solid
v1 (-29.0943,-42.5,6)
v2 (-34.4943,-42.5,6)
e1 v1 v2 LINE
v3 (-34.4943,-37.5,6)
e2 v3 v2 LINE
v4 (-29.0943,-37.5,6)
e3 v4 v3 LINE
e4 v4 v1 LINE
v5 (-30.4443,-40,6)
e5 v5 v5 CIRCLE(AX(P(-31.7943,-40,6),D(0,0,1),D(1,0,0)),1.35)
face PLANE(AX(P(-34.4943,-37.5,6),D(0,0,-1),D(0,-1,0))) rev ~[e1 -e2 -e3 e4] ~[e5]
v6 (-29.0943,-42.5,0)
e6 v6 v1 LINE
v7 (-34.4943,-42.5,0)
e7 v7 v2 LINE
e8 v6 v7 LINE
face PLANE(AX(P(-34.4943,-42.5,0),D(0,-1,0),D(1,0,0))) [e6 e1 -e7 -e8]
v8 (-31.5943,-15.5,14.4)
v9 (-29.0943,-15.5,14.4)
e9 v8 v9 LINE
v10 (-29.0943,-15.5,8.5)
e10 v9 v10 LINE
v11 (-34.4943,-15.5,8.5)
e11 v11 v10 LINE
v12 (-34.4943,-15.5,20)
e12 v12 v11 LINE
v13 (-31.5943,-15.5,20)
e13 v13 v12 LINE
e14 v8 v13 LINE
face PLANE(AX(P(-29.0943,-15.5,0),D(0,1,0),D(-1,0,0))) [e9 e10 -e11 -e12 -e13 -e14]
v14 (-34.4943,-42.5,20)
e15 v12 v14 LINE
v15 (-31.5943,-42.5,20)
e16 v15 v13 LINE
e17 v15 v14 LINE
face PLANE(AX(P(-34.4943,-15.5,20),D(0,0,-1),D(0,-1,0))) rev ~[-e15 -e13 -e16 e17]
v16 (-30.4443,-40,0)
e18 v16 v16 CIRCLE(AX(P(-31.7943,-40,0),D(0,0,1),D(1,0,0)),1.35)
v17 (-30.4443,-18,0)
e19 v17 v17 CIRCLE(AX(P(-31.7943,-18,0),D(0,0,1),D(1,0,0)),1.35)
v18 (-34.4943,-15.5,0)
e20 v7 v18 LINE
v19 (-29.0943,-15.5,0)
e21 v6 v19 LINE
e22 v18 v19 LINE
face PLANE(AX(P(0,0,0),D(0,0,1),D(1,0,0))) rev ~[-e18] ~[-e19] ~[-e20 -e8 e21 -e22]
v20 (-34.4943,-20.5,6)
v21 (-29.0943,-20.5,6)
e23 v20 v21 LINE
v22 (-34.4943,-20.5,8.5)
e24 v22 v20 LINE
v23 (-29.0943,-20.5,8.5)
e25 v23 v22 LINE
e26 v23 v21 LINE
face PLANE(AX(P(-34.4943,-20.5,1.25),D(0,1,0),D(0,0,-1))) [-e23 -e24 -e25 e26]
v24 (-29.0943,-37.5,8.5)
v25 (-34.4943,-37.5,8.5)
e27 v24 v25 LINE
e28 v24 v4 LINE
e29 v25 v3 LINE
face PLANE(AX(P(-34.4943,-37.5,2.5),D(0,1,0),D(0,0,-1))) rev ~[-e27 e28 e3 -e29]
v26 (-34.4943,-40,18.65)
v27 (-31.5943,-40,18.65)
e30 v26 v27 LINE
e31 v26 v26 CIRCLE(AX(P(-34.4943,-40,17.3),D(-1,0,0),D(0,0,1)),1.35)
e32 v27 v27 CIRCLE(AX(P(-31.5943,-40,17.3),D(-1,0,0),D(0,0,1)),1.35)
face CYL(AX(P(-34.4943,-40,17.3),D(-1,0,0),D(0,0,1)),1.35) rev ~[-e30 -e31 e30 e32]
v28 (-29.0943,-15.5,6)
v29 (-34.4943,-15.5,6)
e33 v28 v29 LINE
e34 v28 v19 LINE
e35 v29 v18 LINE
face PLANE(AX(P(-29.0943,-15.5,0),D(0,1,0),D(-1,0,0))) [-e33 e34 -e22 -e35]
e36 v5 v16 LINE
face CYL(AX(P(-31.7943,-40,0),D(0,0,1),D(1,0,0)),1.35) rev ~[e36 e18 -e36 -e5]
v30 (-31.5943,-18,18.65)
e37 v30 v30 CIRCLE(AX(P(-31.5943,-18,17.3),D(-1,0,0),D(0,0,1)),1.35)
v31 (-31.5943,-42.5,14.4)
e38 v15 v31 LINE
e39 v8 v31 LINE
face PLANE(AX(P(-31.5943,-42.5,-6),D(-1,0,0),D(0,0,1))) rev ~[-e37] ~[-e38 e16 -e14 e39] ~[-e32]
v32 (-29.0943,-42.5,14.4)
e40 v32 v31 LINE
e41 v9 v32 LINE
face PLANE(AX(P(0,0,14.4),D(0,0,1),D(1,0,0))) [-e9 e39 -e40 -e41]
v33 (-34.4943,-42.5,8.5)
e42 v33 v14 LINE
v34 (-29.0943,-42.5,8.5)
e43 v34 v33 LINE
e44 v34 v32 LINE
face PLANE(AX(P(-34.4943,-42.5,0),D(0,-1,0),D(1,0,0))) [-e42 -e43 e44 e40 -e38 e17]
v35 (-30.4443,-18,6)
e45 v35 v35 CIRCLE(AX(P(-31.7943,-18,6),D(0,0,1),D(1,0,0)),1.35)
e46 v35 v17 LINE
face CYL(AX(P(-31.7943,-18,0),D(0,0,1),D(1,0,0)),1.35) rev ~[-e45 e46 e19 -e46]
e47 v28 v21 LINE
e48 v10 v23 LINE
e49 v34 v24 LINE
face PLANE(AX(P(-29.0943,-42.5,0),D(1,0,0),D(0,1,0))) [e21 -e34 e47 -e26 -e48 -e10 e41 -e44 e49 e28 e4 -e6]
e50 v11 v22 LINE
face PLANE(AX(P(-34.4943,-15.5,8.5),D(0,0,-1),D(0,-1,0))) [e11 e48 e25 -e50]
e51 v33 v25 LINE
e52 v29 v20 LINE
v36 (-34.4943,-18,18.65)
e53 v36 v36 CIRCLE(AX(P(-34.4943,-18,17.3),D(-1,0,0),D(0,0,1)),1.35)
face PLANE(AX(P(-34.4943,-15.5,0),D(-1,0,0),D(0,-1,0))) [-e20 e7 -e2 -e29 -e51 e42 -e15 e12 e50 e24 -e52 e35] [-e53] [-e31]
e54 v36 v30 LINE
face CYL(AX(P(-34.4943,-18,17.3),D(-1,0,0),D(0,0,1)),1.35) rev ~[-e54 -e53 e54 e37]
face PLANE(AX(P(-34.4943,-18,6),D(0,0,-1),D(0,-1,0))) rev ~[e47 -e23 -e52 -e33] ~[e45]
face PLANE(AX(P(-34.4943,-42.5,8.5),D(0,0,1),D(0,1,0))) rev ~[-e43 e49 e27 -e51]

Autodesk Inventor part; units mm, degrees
ref_plane "YZ Plane" through (0, 0, 0) normal (1, 0, 0) x (0, 1, 0)
ref_plane "XZ Plane" through (0, 0, 0) normal (0, 1, 0) x (-1, 0, 0)
ref_plane "작업 평면1" through (-17.0116, -44.6019, 14.5) normal (0, 0, -1) x (0, 1, 0)
sketch "스케치4" plane through (0, 0, 0) normal (0, 0, 1) x (1, 0, 0)
  arc A0 (-34.0751, 6.2636) -> (-34.5943, 4.5766) centre (-31.5943, 4.5766) ccw projected
  line L0 (-34.5943, -39.6766) -> (-34.5943, 4.5766) projected
  arc A1 (-34.5943, -39.6766) -> (-34.0751, -41.3636) centre (-31.5943, -39.6766) ccw projected
  line L1 (-30.3872, -46.7869) -> (-34.0751, -41.3636) projected
  arc A2 (-30.3872, -46.7869) -> (-27.9064, -48.1) centre (-27.9064, -45.1) ccw projected
  line L2 (-1.0822, -48.1) -> (-27.9064, -48.1) projected
  arc A3 (-1.0822, -48.1) -> (1.3986, -46.7869) centre (-1.0822, -45.1) ccw projected
  line L3 (5.0865, -41.3636) -> (1.3986, -46.7869) projected
  arc A4 (5.0865, -41.3636) -> (5.6057, -39.6766) centre (2.6057, -39.6766) ccw projected
  line L4 (5.6057, 4.5766) -> (5.6057, -39.6766) projected
  arc A5 (5.6057, 4.5766) -> (5.0865, 6.2636) centre (2.6057, 4.5766) ccw projected
  line L5 (1.1009, 12.1246) -> (5.0865, 6.2636) projected
  arc A6 (1.1009, 12.1246) -> (-0.5529, 13) centre (-0.5529, 11) ccw projected
  line L6 (-6.8443, 13) -> (-0.5529, 13) projected
  arc A7 (-5.3443, 11.5) -> (-6.8443, 13) centre (-6.8443, 11.5) ccw projected
  line L7 (-5.3443, 11.5) -> (-5.3443, 10) projected
  arc A8 (-5.3443, 10) -> (-2.9943, 7.65) centre (-2.9943, 10) ccw projected
  line L8 (-2.9943, 7.65) -> (-0.9943, 7.65) projected
  arc A9 (0.0057, 6.65) -> (-0.9943, 7.65) centre (-0.9943, 6.65) ccw projected
  line L9 (0.0057, 6.65) -> (0.0057, -36.15) projected
  arc A10 (-0.9943, -37.15) -> (0.0057, -36.15) centre (-0.9943, -36.15) ccw projected
  line L10 (-0.9943, -37.15) -> (-2.9943, -37.15) projected
  arc A11 (-2.9943, -37.15) -> (-5.3443, -39.5) centre (-2.9943, -39.5) ccw projected
  line L11 (-5.3443, -39.5) -> (-5.3443, -41.5) projected
  arc A12 (-6.3443, -42.5) -> (-5.3443, -41.5) centre (-6.3443, -41.5) ccw projected
  line L12 (-6.3443, -42.5) -> (-22.6443, -42.5) projected
  arc A13 (-23.6443, -41.5) -> (-22.6443, -42.5) centre (-22.6443, -41.5) ccw projected
  line L13 (-23.6443, -41.5) -> (-23.6443, -39.5) projected
  arc A14 (-23.6443, -39.5) -> (-25.9943, -37.15) centre (-25.9943, -39.5) ccw projected
  line L14 (-25.9943, -37.15) -> (-27.9943, -37.15) projected
  arc A15 (-28.9943, -36.15) -> (-27.9943, -37.15) centre (-27.9943, -36.15) ccw projected
  line L15 (-28.9943, -36.15) -> (-28.9943, 6.65) projected
  arc A16 (-27.9943, 7.65) -> (-28.9943, 6.65) centre (-27.9943, 6.65) ccw projected
  line L16 (-27.9943, 7.65) -> (-25.9943, 7.65) projected
  arc A17 (-25.9943, 7.65) -> (-23.6443, 10) centre (-25.9943, 10) ccw projected
  line L17 (-23.6443, 10) -> (-23.6443, 11.5) projected
  arc A18 (-22.1443, 13) -> (-23.6443, 11.5) centre (-22.1443, 11.5) ccw projected
  line L18 (-28.4357, 13) -> (-22.1443, 13) projected
  arc A19 (-28.4357, 13) -> (-30.0896, 12.1246) centre (-28.4357, 11) ccw projected
  line L19 (-34.0751, 6.2636) -> (-30.0896, 12.1246) projected
  circle A20 centre (2.8057, 4) radius 1.35 projected
  circle A21 centre (2.8057, -18) radius 1.35 projected
  circle A22 centre (-3.4943, -45.3) radius 1.35 projected
  circle A23 centre (-31.7943, 4) radius 1.35 projected
  circle A24 centre (-31.7943, -18) radius 1.35 projected
  circle A25 centre (-25.4943, -45.3) radius 1.35 projected
  circle A26 centre (2.8057, -40) radius 1.35 projected
  circle A27 centre (-31.7943, -40) radius 1.35 projected
  line L20 (-31.7943, -40) -> (-31.7943, -18)
  line L21 (-29.0943, -15.5) -> (-34.4943, -15.5)
  line L22 (-34.4943, -15.5) -> (-34.4943, -42.5)
  line L23 (-34.4943, -42.5) -> (-29.0943, -42.5)
  line L24 (-29.0943, -42.5) -> (-29.0943, -15.5)
  line L25 (-29.0943, -15.5) -> (-34.4943, -42.5) construction
  line L26 (-34.4943, -15.5) -> (-29.0943, -42.5) construction
  point P0 (0, 0)
  point P1 (-31.7943, -29)
  dimension "d10" = 5.4
  dimension "d11" = 27
extrude "돌출4" add sketch "스케치4" against normal blind 6 contours L22 L21 L24 L23 L1 A1 | A1 L1 L23 L22
sketch "스케치5" plane through (0, 0, 0) normal (0, 0, 1) x (1, 0, 0)
  line L0 (-34.4943, -15.5) -> (-34.4943, -42.5) projected
  line L1 (-34.4943, -42.5) -> (-29.0943, -42.5) projected
  line L2 (-29.0943, -42.5) -> (-29.0943, -15.5) projected
  line L3 (-29.0943, -15.5) -> (-34.4943, -15.5) projected
  circle A0 centre (-31.7943, -40) radius 1.35 projected
  circle A1 centre (-31.7943, -18) radius 1.35 projected
  point P0 (0, 0)
extrude "돌출5" add sketch "스케치5" along normal blind 14.4 contours L3 L2 L1 L0 | A0 | A1
sketch "스케치6" plane through (-34.4943, -42.5, -6) normal (-1, 0, 0) x (0, 0, 1)
  line L0 (25.6, 57) -> (29.1, 57) projected
  line L1 (25.6, 57) -> (20.5, 51) projected
  line L2 (20.5, 51) -> (20.5, -2.1) projected
  line L3 (20.5, -2.1) -> (25.6, -8.1) projected
  line L4 (25.6, -8.1) -> (55.6, -8.1) projected
  line L5 (55.6, -8.1) -> (60.7, -2.1) projected
  line L6 (60.7, -2.1) -> (60.7, 51) projected
  line L7 (60.7, 51) -> (55.6, 57) projected
  line L8 (52.1, 57) -> (55.6, 57) projected
  arc A0 (55.1, 54) -> (52.1, 57) centre (52.1, 54) ccw projected
  line L9 (55.1, 0.5) -> (55.1, 54) projected
  arc A1 (52.1, -2.5) -> (55.1, 0.5) centre (52.1, 0.5) ccw projected
  line L10 (29.1, -2.5) -> (52.1, -2.5) projected
  arc A2 (26.1, 0.5) -> (29.1, -2.5) centre (29.1, 0.5) ccw projected
  line L11 (26.1, 54) -> (26.1, 0.5) projected
  arc A3 (29.1, 57) -> (26.1, 54) centre (29.1, 54) ccw projected
  circle A4 centre (57.9, 46.5) radius 1.35 projected
  circle A5 centre (57.9, 24.5) radius 1.35 projected
  circle A6 centre (57.9, 2.5) radius 1.35 projected
  circle A7 centre (51.6, -5.3) radius 1.35 projected
  circle A8 centre (23.3, 46.5) radius 1.35 projected
  circle A9 centre (23.3, 24.5) radius 1.35 projected
  circle A10 centre (23.3, 2.5) radius 1.35 projected
  circle A11 centre (29.6, -5.3) radius 1.35 projected
  line L12 (20.4, 27) -> (0, 27) projected
  line L13 (0, 0) -> (0, 27) projected
  line L14 (0, 0) -> (20.4, 0) projected
  line L15 (20.4, 27) -> (20.4, 0) projected
  line L16 (20.4, 0) -> (20.4, 27)
  line L17 (20.4, 27) -> (26, 27)
  line L18 (26, 27) -> (26, 0)
  line L19 (26, 0) -> (20.4, 0)
  point P0 (6, 42.5)
  dimension "d16" = 5.6
extrude "돌출6" add sketch "스케치6" against normal blind 2.9 contours L17 L18 L19 L2 | L2 L19 L15 L17
sketch "스케치7" plane through (-34.4943, -42.5, -6) normal (-1, 0, 0) x (0, 0, 1)
  line L0 (0, 1.15) -> (0, 3.85) projected
  line L1 (6, 3.85) -> (6, 1.15) projected
  line L2 (0, 23.15) -> (0, 25.85) projected
  line L3 (0, 23.15) -> (0, 25.85) projected
  line L4 (6, 2.5) -> (0, 2.5)
  line L5 (0, 2.5) -> (0, 24.5)
  line L6 (0, 24.5) -> (6, 24.5)
  line L7 (6, 24.5) -> (6, 2.5)
  line L8 (6, 2.5) -> (6, 24.5)
  line L9 (6, 24.5) -> (7.25, 24.5)
  line L10 (7.25, 24.5) -> (7.25, 2.5)
  line L11 (7.25, 2.5) -> (6, 2.5)
  line L12 (8.5, 5) -> (6, 5)
  line L13 (6, 5) -> (6, 0)
  line L14 (6, 0) -> (8.5, 0)
  line L15 (8.5, 0) -> (8.5, 5)
  line L16 (8.5, 5) -> (6, 0) construction
  line L17 (6, 5) -> (8.5, 0) construction
  line L18 (8.5, 22) -> (6, 22)
  line L19 (6, 22) -> (6, 27)
  line L20 (6, 27) -> (8.5, 27)
  line L21 (8.5, 27) -> (8.5, 22)
  line L22 (8.5, 22) -> (6, 27) construction
  line L23 (6, 22) -> (8.5, 27) construction
  point P0 (6, 42.5)
  point P1 (6, 5)
  point P2 (6, 1.15)
  dimension "d19" = 1.25
  dimension "d20" = 2.5
  dimension "d21" = 5
  dimension "d22" = 2.5
  dimension "d23" = 5
extrude "돌출7" cut sketch "스케치7" against normal through all contours L11 L10 L12 L15 L14 L13 L1 | L1 L7 L12 L10 L11 | L9 L10 L18 L7 | L19 L20 L21 L18 L10 L9
move faces "이동1" translate (0, 0, 6) faces at (-29.5959, -25.5425, -6) (-32.6943, -37.5, 1.6667) (-32.6943, -20.5, 0.8333) (-30.8943, -17.1667, 2.5) (-29.5443, -18, 0) (-30.4487, -18.1086, -4) (-30.8943, -15.5, -2) (-30.8943, -39.1667, 2.5) (-29.5443, -40, 0) (-30.4487, -40.1086, -4) (-32.6943, -42.5, -4)
properties part number "Vertical_Connector" material "LCP 플라스틱"
